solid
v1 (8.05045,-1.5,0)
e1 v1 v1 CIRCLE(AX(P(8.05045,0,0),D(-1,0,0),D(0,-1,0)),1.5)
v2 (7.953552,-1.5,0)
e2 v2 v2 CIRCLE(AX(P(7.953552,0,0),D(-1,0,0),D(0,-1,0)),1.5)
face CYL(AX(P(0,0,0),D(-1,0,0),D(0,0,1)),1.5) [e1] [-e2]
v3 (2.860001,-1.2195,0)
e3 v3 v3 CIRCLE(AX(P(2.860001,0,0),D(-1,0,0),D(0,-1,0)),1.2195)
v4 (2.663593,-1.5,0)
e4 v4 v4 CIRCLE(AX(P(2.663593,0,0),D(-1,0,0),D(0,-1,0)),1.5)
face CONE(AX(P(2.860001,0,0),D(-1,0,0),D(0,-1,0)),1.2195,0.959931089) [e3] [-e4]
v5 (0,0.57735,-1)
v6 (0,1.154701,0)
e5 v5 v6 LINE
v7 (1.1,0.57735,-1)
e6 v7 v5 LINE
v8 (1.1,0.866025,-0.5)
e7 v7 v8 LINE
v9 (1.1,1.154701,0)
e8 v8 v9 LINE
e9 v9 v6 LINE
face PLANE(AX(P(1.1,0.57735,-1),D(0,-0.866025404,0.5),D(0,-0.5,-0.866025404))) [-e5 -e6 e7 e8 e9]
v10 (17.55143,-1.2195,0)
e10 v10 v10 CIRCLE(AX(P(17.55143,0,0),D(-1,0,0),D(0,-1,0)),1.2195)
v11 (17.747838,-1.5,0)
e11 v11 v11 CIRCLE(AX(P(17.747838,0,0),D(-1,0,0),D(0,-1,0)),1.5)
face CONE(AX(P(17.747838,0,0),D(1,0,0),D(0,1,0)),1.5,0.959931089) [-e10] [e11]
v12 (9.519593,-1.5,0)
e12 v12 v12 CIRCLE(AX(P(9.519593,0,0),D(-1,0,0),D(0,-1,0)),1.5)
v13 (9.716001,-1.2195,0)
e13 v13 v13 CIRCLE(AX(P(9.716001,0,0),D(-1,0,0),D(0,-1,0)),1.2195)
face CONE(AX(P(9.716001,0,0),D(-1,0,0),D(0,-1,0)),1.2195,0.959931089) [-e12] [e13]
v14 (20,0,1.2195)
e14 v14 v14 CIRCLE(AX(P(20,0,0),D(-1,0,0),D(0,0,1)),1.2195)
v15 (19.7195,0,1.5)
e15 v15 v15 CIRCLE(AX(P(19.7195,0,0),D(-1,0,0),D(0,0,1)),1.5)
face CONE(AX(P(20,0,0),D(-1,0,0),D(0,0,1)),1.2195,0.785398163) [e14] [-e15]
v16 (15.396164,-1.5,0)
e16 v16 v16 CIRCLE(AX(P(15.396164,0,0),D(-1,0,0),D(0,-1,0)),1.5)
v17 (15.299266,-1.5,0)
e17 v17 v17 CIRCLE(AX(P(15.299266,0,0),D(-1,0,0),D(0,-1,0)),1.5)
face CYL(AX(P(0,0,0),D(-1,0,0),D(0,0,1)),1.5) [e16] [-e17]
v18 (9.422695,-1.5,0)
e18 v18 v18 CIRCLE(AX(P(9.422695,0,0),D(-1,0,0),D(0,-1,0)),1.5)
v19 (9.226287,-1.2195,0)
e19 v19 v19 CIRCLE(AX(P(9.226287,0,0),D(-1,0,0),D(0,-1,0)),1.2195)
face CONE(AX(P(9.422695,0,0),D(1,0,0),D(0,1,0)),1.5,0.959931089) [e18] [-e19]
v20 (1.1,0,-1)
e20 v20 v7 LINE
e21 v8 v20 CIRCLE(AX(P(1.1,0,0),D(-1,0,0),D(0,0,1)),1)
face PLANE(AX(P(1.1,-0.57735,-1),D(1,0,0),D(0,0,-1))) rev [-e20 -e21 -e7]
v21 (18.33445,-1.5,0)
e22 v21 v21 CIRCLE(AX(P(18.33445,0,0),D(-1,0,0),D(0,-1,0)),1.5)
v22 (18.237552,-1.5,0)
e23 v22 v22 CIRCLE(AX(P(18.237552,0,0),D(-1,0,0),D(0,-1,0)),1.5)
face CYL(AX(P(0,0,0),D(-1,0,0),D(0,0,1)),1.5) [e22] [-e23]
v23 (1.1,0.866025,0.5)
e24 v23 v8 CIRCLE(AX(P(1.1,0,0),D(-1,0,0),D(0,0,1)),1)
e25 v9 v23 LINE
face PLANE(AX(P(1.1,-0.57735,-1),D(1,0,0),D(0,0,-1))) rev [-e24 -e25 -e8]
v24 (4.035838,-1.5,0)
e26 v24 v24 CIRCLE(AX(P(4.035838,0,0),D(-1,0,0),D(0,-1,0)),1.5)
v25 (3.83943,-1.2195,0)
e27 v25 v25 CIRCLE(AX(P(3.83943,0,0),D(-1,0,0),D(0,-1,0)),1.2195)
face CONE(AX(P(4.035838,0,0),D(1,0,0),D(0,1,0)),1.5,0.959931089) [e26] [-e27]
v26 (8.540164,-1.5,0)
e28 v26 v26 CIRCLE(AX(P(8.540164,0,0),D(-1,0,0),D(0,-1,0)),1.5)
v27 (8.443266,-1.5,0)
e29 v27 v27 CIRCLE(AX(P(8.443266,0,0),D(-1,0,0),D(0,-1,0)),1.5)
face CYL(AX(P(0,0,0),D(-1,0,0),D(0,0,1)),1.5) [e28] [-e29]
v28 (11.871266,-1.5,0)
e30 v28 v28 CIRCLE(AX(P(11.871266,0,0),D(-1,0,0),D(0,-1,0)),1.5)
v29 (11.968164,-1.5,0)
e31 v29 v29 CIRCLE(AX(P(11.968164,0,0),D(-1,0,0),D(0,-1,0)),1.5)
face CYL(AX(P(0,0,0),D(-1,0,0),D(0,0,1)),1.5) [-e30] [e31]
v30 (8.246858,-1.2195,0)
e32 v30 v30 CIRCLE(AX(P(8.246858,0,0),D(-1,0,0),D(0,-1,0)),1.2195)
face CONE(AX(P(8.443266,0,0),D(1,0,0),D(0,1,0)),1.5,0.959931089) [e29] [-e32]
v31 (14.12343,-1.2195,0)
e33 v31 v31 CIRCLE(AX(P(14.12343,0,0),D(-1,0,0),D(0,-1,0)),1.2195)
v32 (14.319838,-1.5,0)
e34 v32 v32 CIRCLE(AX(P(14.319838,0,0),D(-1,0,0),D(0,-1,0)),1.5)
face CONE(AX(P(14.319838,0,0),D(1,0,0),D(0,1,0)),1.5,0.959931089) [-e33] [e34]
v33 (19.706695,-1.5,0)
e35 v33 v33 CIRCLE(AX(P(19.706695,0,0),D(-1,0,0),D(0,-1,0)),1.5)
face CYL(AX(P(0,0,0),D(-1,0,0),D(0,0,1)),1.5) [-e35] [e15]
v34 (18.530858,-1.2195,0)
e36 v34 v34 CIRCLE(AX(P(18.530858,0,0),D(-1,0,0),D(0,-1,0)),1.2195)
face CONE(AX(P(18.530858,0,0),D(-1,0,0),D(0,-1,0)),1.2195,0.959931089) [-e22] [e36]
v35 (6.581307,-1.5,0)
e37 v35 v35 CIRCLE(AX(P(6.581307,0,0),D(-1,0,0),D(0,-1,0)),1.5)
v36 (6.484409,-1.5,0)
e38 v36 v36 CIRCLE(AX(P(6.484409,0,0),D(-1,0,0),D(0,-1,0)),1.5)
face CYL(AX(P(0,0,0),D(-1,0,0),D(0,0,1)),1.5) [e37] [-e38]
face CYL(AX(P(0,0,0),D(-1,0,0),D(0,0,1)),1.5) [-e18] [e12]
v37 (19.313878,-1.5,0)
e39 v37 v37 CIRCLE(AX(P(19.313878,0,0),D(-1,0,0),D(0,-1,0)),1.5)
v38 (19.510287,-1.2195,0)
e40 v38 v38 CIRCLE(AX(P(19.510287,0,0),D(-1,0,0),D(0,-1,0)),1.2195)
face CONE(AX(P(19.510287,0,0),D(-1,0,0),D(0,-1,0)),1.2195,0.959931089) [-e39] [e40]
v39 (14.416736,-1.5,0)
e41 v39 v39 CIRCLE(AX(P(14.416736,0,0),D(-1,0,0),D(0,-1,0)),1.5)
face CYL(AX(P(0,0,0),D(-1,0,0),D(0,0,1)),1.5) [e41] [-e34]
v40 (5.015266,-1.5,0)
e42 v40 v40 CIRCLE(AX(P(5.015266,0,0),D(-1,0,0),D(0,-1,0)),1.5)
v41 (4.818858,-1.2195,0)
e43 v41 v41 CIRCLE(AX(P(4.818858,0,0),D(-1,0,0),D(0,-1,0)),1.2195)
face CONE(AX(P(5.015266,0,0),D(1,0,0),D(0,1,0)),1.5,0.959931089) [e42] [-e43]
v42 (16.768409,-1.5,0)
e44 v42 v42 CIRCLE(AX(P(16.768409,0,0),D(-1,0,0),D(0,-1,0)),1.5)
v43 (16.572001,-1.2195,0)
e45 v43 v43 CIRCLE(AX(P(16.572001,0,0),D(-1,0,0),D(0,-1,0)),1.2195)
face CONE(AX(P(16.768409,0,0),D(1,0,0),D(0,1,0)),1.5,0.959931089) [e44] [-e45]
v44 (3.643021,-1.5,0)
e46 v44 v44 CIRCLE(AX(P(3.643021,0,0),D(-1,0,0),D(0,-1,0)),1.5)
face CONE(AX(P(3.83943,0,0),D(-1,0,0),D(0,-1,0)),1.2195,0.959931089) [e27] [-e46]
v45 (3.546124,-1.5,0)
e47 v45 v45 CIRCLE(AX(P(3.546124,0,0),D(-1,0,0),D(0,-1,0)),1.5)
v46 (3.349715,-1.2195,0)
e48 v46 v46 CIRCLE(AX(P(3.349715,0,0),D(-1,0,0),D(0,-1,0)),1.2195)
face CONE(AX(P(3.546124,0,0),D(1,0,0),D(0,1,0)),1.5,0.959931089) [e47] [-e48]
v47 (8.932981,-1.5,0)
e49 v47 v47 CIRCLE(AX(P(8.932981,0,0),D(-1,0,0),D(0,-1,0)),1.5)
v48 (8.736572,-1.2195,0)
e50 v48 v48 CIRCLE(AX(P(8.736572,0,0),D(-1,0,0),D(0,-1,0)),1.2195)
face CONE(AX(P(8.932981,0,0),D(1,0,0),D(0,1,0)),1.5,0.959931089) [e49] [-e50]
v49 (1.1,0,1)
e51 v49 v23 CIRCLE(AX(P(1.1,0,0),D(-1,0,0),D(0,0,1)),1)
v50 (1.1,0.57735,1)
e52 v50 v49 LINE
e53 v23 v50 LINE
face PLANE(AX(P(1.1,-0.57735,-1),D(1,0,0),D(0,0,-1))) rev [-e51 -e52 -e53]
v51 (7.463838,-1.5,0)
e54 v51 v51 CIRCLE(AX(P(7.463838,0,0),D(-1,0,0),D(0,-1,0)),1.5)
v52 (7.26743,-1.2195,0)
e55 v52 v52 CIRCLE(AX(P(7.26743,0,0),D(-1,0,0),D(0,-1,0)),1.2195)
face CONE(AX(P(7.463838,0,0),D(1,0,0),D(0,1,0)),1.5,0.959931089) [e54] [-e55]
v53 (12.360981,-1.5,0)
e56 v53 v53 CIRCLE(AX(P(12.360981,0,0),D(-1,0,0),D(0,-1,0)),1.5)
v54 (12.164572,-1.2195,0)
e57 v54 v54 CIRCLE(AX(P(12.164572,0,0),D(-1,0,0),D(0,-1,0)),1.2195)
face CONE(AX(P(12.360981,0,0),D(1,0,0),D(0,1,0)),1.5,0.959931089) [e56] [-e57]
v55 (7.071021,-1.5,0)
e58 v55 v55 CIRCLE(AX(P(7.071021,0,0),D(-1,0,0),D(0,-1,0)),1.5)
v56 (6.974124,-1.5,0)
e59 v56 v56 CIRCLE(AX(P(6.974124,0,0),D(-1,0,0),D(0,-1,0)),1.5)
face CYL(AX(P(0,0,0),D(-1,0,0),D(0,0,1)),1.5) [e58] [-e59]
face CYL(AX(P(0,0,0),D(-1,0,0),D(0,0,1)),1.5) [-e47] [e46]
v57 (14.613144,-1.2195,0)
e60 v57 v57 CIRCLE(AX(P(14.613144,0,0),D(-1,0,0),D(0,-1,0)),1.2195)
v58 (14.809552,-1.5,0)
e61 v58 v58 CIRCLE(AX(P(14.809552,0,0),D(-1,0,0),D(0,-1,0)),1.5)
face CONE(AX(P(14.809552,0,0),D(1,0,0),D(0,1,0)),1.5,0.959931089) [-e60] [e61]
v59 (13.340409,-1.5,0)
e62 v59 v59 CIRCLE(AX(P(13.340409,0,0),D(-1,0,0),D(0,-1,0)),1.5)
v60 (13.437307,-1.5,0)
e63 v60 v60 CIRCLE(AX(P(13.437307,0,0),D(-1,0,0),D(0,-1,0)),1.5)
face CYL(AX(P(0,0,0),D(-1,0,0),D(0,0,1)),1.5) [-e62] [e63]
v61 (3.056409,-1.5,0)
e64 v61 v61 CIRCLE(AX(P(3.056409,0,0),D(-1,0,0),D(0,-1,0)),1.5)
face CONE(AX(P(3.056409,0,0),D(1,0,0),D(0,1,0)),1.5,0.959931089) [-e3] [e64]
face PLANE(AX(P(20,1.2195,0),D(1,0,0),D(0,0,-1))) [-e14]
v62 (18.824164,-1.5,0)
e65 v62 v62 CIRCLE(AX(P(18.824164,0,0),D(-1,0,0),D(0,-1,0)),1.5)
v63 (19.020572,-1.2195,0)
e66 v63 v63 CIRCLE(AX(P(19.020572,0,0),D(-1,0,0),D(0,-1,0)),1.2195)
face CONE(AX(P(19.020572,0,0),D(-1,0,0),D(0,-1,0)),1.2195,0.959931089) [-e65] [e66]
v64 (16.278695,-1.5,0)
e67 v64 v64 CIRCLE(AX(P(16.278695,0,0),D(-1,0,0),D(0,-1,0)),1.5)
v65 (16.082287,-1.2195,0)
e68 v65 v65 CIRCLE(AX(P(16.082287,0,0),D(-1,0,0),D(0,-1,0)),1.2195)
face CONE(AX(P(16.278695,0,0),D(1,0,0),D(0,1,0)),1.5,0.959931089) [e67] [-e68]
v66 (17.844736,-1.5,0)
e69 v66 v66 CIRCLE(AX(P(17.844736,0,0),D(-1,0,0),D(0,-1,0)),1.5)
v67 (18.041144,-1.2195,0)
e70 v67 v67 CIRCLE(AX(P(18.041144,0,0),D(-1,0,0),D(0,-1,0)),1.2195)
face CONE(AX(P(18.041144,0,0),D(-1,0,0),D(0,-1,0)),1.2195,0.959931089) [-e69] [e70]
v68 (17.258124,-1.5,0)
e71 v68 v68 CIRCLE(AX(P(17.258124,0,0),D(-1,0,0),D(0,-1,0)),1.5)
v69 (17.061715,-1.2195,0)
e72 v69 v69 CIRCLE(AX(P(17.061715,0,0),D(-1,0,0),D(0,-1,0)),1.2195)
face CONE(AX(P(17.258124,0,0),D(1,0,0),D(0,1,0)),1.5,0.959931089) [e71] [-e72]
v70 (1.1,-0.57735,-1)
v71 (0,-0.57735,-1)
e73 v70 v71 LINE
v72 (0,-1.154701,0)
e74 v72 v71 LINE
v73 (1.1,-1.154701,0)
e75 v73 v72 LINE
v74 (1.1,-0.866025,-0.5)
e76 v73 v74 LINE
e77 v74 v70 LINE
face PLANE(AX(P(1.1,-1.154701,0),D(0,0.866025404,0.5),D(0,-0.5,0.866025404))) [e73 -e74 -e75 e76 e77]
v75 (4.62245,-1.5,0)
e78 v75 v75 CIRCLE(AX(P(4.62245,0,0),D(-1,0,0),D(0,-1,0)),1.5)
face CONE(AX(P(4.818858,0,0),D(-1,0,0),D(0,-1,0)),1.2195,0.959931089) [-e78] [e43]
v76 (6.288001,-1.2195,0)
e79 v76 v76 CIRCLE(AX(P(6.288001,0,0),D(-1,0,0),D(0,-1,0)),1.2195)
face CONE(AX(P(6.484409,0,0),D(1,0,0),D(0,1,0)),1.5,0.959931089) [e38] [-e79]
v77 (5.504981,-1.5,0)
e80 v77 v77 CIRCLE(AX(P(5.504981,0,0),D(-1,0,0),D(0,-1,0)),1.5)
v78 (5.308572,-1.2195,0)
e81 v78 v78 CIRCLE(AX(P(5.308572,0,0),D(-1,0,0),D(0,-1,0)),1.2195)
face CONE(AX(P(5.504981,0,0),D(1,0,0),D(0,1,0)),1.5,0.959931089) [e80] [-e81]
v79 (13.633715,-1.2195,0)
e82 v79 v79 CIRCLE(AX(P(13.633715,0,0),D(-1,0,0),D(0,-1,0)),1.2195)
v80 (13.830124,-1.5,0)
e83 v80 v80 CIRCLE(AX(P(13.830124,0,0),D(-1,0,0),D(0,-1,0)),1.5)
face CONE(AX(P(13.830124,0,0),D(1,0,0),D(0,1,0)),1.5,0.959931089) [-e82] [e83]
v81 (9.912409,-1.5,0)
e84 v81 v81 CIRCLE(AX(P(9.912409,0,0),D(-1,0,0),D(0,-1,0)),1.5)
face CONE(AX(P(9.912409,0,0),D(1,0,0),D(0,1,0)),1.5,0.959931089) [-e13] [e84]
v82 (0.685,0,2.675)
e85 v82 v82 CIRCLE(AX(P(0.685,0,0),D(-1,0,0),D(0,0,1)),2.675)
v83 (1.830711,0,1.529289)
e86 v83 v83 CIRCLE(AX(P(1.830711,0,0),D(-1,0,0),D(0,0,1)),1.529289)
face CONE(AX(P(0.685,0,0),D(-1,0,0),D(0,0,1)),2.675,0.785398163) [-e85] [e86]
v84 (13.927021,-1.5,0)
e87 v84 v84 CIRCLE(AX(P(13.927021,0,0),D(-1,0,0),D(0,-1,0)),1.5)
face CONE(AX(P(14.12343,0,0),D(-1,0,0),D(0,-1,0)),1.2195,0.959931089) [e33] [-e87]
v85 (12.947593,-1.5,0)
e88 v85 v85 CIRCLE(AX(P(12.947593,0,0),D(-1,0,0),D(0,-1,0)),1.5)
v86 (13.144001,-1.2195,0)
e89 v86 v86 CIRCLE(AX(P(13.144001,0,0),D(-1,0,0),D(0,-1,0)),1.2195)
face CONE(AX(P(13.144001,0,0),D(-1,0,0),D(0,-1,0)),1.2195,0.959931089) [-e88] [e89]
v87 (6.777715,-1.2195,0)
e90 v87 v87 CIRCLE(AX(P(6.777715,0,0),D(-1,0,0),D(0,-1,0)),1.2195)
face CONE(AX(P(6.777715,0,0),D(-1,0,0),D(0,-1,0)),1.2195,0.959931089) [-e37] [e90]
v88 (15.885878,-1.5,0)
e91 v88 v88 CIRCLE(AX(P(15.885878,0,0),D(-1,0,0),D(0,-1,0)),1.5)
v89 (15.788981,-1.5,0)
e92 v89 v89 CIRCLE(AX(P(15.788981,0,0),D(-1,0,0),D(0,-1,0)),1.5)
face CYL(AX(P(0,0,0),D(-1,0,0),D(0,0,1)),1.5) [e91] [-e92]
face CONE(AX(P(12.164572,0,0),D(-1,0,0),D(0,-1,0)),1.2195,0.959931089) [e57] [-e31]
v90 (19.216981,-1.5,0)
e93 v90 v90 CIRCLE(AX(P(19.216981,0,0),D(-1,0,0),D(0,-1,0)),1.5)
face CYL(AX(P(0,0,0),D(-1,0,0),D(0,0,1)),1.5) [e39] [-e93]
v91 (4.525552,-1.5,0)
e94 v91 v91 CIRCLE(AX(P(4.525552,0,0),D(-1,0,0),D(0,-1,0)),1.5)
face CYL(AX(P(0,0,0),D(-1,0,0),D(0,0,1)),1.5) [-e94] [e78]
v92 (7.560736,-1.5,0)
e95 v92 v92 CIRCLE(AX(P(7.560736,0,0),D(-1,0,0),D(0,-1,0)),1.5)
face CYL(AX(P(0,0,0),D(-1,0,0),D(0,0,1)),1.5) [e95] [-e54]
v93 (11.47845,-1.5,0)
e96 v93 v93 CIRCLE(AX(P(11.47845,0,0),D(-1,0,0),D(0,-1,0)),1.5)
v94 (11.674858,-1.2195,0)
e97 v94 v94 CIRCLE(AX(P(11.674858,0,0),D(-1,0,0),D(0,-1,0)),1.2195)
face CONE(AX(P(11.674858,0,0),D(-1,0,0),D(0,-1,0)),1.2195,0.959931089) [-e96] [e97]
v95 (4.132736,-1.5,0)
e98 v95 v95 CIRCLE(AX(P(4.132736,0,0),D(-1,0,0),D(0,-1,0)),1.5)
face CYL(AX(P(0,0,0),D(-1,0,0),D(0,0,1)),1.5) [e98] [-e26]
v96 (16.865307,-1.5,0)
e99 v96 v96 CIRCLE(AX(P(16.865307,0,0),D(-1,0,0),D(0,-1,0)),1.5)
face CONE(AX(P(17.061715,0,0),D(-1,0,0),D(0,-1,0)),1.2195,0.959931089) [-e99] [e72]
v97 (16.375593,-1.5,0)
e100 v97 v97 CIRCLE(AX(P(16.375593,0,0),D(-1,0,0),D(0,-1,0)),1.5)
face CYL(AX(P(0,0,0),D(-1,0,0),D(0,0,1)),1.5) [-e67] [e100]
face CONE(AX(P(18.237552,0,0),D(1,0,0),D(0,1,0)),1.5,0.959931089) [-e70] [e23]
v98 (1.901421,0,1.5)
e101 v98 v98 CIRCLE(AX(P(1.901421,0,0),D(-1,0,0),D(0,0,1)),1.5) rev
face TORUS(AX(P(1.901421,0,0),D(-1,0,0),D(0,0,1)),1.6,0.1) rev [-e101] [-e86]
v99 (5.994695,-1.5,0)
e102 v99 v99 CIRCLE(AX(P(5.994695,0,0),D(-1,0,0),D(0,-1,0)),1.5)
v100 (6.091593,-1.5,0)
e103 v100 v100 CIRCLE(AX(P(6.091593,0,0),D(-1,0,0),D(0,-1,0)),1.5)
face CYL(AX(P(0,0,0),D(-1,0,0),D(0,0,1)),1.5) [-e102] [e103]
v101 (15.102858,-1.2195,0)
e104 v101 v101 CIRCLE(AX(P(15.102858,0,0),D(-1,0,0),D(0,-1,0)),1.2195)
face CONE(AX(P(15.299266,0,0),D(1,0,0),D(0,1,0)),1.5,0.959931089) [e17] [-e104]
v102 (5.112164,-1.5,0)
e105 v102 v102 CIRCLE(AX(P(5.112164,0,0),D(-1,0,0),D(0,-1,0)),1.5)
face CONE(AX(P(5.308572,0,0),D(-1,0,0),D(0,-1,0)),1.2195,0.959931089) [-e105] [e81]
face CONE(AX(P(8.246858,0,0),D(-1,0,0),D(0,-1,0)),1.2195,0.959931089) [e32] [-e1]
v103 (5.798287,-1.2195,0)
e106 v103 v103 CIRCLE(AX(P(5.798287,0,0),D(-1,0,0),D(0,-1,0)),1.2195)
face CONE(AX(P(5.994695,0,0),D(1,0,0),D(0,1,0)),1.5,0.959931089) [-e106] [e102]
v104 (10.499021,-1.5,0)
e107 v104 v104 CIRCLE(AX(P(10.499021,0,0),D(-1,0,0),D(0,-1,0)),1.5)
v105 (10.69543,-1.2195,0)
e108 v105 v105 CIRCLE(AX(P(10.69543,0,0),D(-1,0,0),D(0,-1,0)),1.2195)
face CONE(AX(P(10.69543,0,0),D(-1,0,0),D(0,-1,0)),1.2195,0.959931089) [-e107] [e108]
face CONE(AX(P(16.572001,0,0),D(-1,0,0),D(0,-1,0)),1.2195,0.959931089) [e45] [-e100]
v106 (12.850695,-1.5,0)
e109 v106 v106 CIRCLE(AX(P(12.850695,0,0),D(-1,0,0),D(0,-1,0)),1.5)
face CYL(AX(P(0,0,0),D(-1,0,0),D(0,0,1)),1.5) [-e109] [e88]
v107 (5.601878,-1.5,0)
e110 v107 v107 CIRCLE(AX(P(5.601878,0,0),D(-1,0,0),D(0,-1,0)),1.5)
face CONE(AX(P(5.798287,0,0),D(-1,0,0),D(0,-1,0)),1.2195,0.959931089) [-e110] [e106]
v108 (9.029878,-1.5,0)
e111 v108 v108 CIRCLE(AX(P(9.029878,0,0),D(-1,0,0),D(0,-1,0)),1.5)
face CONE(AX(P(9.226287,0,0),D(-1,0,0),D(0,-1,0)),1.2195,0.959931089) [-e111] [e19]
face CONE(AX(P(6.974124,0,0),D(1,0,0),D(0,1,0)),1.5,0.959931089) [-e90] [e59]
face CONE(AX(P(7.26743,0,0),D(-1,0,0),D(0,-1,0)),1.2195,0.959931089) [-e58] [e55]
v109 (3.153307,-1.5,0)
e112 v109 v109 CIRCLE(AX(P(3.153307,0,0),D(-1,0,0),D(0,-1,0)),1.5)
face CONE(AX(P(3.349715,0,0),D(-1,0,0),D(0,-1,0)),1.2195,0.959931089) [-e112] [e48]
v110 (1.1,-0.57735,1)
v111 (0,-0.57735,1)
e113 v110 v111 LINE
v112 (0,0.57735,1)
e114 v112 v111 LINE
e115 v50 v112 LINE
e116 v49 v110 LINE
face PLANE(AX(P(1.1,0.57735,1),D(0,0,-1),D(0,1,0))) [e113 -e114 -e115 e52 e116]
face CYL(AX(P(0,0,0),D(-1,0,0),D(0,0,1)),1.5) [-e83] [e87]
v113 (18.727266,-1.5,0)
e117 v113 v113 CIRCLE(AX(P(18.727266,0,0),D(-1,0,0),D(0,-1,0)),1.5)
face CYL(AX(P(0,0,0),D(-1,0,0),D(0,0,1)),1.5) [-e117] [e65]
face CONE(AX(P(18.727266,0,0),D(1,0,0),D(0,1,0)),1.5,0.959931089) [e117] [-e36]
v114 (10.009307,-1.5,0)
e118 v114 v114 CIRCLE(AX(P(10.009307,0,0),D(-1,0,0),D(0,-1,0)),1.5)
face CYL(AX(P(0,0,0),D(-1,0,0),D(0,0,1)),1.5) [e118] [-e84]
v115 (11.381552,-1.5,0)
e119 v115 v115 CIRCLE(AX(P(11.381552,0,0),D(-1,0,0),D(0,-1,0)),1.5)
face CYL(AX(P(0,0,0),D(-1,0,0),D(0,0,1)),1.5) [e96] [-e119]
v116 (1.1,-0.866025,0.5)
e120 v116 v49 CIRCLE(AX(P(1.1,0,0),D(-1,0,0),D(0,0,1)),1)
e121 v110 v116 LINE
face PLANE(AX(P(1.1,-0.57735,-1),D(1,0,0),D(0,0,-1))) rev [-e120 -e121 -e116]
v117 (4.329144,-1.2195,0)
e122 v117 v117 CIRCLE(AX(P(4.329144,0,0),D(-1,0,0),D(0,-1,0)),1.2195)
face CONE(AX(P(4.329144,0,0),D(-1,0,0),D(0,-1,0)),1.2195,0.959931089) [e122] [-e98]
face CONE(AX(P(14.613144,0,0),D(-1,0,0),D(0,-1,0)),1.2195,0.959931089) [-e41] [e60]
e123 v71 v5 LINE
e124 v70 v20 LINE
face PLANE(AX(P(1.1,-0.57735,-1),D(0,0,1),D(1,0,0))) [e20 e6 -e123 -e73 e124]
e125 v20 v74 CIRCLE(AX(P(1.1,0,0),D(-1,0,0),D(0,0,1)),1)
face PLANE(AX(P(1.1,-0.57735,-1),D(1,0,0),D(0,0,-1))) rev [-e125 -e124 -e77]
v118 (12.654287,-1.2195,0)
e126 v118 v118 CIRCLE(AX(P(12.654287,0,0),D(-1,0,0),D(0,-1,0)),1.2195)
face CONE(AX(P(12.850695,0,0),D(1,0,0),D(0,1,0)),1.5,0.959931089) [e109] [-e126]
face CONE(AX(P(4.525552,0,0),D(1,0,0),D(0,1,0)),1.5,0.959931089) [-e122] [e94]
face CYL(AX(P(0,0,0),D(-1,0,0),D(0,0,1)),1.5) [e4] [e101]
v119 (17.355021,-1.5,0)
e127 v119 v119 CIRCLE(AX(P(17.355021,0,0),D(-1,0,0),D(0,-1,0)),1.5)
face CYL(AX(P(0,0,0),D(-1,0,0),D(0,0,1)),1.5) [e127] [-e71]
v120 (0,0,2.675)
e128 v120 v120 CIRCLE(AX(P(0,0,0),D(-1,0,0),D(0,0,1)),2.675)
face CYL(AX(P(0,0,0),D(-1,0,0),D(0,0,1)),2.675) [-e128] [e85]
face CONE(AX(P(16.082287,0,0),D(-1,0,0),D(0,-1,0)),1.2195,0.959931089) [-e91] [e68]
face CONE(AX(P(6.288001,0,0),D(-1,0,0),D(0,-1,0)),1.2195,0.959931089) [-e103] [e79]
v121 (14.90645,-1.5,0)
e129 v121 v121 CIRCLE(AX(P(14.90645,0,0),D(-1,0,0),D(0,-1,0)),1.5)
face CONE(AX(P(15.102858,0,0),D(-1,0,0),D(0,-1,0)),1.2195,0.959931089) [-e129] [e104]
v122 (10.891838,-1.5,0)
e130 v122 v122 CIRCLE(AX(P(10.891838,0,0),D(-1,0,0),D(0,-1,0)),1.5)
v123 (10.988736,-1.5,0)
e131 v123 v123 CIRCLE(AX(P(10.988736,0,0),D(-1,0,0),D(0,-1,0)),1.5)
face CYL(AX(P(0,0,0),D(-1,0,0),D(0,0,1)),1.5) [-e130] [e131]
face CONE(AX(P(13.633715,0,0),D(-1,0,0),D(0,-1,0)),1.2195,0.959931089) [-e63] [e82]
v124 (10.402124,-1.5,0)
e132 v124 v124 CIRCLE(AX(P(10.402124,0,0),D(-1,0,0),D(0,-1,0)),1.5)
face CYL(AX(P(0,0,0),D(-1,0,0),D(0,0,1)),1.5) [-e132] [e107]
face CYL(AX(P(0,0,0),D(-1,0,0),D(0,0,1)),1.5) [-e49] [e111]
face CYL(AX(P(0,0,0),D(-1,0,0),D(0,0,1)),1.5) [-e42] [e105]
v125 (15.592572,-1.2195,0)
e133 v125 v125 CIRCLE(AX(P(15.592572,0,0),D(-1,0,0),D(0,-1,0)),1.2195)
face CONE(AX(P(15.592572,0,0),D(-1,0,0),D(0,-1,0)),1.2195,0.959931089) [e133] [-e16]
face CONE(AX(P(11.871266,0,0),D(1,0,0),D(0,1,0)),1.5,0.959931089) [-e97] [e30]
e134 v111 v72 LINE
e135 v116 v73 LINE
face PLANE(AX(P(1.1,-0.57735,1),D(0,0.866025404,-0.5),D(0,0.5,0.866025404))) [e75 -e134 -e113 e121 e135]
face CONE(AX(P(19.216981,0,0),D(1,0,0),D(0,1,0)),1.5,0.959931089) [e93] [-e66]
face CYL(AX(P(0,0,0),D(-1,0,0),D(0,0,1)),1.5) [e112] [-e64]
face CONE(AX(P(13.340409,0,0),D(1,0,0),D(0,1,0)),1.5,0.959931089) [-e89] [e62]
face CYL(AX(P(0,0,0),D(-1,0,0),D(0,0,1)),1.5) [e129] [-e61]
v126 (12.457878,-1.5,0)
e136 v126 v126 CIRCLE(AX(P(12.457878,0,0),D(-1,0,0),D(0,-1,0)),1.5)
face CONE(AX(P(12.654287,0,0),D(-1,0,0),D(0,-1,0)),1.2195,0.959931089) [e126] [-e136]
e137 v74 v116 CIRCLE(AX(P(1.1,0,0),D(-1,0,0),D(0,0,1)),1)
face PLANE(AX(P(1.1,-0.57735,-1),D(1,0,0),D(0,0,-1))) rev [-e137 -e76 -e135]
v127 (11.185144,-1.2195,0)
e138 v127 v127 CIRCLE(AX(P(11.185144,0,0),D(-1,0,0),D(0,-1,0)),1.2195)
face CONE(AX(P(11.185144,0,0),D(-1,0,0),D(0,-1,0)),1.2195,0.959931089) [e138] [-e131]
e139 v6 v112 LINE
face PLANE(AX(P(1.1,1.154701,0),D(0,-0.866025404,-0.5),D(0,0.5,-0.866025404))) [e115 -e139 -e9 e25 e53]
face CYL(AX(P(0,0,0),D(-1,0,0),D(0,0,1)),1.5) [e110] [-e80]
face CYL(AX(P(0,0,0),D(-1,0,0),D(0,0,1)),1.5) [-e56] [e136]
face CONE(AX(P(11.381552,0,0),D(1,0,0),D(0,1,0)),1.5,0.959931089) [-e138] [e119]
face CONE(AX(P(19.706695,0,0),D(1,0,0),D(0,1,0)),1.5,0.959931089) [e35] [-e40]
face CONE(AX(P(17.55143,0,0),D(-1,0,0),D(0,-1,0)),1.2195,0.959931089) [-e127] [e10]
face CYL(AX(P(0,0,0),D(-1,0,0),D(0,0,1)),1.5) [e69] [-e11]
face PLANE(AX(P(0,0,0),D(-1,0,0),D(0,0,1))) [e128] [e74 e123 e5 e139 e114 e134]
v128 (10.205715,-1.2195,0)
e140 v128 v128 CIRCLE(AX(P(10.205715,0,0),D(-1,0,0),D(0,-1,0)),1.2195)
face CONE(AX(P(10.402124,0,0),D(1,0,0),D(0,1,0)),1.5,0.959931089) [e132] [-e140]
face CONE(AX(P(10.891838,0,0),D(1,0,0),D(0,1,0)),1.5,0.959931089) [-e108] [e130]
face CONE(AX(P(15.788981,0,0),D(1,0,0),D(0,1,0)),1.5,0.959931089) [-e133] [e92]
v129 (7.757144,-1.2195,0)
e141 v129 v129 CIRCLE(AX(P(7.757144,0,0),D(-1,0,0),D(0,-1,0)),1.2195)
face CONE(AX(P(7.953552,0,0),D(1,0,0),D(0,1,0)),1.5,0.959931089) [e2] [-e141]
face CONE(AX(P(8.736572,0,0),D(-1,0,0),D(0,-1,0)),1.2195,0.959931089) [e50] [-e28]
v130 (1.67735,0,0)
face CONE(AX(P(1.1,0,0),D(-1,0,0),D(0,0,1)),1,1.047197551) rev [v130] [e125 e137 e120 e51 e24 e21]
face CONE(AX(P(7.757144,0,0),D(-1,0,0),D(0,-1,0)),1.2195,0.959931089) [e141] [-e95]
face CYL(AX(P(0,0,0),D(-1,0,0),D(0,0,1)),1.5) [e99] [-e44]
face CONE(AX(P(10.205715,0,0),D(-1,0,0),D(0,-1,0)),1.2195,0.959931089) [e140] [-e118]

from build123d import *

# Parameters (mm, degrees)
FILLET1_R       = 0.1
HEX_START       = -1.1
HEX_2_DEPTH     = 1.1
THDSCHPAT_COUNT = 35
THDSCHPAT_PITCH = 0.489714286


with BuildPart() as part:
    # BodySke → BaseBody (revolve)
    with BuildSketch(Plane.XY, mode=Mode.PRIVATE) as basebody_sk:
        Polygon((0, 0), (0, 2.675), (0.685, 2.675), (1.86, 1.5), (19.7195, 1.5), (20, 1.2195), (20, 0), align=None)
    revolve(basebody_sk.sketch.rotate(Axis((0, 0, 0), (1, 0, 0)), 90), axis=Axis((0, 0, 0), (1, 0, 0)))

    # Fillet1
    fillet1_edges = [part.edges().sort_by_distance(p)[0] for p in [
        (1.86, 0, -1.5),
    ]]
    fillet(fillet1_edges, radius=FILLET1_R)

    # Hex 2: read off the stored shape, not the designer's step
    # Hex 2 outline → Hex 2 (cut)
    with BuildSketch(Plane.ZY.offset(HEX_START)):
        Polygon((-1, -0.577350269), (0, -1.154700538), (1, -0.577350269), (1, 0.577350269), (0, 1.154700538), (-1, 0.577350269), align=None)
    extrude(amount=HEX_2_DEPTH, mode=Mode.SUBTRACT)

    # Hex 2 2 outline → Hex 2 2 (revolve, cut)
    with BuildSketch(Plane.YX):
        Polygon((1, 1.1), (0, 1.677350269), (0, 1.1), align=None)
    revolve(axis=Axis((0, 0, 0), (1, 0, 0)), mode=Mode.SUBTRACT)

    # ThdSchSke → ThreadSchematic (revolve, cut)
    with BuildSketch(Plane.XY, mode=Mode.PRIVATE) as threadschematic_sk:
        Polygon((2.860001, -1.2195), (2.663592786, -1.5), (2.663592786, -1.875), (3.056409214, -1.875), (3.056409214, -1.5), align=None)
    threadschematic = revolve(threadschematic_sk.sketch.rotate(Axis((-3.175, 0, 0), (1, 0, 0)), 270), axis=Axis((-3.175, 0, 0), (1, 0, 0)), mode=Mode.SUBTRACT)

    # ThdSchPat: ThreadSchematic ×35
    with Locations(*[(i * THDSCHPAT_PITCH, 0, 0) for i in range(1, THDSCHPAT_COUNT)]):
        add(threadschematic, mode=Mode.SUBTRACT)


solid = part.part
